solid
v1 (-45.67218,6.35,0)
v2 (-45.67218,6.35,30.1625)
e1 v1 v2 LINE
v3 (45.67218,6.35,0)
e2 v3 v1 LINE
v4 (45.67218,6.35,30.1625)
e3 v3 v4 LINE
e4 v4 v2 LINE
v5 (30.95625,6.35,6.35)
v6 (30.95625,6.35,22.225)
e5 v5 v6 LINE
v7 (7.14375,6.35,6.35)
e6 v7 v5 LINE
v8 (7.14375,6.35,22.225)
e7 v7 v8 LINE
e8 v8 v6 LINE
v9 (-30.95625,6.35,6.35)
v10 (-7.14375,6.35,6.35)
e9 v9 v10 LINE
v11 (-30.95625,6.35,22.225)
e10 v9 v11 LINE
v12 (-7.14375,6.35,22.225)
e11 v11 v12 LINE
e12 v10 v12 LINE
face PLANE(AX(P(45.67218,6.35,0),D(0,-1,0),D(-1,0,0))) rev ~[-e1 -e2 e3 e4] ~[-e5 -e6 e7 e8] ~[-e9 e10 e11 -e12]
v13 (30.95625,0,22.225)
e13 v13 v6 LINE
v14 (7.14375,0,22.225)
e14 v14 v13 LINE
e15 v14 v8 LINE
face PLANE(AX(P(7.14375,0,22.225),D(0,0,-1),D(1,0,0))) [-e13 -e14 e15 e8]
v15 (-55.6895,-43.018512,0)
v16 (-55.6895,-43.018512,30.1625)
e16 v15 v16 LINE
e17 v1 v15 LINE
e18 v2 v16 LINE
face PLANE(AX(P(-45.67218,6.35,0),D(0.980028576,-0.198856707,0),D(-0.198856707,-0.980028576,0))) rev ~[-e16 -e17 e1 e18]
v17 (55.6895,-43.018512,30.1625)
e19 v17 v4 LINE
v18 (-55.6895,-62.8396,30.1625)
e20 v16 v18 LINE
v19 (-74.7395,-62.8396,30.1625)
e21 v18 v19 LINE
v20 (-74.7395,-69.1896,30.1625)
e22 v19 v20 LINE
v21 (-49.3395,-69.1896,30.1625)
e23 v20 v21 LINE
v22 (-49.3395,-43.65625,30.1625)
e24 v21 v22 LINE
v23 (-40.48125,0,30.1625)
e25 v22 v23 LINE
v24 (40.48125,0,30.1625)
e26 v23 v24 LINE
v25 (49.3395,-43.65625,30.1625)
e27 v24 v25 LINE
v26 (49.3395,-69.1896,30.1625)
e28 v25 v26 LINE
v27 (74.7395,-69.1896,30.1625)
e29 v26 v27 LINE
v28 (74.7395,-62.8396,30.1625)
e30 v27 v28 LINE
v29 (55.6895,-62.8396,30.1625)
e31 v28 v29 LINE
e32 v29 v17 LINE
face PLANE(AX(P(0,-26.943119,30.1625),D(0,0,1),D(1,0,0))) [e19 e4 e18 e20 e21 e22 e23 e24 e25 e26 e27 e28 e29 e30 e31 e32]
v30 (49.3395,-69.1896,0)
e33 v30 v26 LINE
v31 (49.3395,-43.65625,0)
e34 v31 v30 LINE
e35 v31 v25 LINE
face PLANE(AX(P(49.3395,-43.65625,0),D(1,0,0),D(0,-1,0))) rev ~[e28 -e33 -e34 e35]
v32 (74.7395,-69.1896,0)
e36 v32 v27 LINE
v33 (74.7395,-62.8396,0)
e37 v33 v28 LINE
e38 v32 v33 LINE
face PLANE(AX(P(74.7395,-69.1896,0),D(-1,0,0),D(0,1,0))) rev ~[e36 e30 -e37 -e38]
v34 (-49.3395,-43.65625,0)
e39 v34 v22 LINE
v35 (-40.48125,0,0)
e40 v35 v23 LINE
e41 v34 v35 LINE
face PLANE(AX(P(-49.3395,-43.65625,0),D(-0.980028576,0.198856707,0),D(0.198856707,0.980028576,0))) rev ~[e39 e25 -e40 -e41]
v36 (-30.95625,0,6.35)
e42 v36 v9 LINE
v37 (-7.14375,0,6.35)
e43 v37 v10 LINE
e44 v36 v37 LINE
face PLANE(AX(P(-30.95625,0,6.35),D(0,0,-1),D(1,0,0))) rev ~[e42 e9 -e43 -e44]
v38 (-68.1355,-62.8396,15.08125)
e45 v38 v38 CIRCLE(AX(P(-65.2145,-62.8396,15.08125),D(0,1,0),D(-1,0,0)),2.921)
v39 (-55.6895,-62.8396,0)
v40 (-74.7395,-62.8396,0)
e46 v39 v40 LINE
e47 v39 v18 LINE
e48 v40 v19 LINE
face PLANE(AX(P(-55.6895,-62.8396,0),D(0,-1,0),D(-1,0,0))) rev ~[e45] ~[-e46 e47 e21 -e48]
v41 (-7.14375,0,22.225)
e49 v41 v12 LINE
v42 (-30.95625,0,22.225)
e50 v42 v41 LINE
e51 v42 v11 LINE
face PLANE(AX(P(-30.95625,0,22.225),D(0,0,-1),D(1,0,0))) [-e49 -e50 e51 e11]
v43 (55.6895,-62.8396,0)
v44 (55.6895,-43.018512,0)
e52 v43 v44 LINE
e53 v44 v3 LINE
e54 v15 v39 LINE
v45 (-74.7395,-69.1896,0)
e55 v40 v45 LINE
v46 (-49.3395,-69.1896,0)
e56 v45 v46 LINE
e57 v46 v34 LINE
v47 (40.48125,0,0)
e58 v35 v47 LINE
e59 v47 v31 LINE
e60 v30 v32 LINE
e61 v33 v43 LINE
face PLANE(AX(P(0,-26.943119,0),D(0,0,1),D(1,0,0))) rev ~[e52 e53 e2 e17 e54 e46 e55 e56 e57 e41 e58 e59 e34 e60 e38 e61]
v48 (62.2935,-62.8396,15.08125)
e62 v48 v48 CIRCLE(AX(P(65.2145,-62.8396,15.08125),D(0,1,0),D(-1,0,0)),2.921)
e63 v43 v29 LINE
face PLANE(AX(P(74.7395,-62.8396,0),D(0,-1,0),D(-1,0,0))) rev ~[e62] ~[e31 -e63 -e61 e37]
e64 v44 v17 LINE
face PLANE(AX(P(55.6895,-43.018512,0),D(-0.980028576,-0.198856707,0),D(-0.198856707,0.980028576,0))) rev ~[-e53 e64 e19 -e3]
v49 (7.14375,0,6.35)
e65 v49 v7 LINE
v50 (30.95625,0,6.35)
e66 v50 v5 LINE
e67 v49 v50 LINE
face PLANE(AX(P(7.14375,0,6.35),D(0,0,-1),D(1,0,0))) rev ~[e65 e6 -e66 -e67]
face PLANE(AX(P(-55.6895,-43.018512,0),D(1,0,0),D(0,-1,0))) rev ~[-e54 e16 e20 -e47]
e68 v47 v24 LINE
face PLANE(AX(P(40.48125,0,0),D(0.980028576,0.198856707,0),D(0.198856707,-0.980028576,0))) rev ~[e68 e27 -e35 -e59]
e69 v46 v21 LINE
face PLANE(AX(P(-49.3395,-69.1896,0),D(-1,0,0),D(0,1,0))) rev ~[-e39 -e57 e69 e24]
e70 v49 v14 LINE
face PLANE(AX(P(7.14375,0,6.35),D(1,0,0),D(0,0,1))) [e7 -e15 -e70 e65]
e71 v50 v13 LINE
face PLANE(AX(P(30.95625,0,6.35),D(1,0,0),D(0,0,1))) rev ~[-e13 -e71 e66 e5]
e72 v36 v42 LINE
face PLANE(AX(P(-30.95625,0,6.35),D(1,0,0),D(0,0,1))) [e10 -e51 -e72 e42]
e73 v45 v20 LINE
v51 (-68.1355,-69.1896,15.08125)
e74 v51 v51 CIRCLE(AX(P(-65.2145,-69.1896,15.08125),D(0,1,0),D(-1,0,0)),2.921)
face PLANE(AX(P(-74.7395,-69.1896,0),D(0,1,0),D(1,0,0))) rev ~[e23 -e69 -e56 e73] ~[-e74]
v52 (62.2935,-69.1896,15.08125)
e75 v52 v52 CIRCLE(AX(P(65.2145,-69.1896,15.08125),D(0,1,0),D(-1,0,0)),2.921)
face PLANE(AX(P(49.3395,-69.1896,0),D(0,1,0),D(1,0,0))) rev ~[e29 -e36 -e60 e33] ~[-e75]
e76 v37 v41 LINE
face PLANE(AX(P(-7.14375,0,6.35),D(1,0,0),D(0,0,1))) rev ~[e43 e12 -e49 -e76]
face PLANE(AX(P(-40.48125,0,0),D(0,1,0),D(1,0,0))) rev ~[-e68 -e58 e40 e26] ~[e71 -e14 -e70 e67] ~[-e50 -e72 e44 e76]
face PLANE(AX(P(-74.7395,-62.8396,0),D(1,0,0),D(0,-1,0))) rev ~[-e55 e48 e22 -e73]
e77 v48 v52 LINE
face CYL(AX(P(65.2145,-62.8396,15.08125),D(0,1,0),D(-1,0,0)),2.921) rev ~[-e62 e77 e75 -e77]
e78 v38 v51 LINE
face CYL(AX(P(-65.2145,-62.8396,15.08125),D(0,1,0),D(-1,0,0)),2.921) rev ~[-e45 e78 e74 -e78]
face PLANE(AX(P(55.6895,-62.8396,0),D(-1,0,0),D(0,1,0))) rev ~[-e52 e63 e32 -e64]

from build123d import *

# Parameters (mm, degrees)
F1_DEPTH = 30.1625
F2_W     = 23.8125
F2_H     = 15.875
F3_DEPTH = 6.35
F4_R     = 2.921
F5_DEPTH = 6.35


# Not quite as in the source:
# - a feature names something its author has since deleted; it is built from what else it names


with BuildPart() as f1:
    # F0 (on Top) → F1 (new body)
    with BuildSketch(Plane.XY):
        Polygon((-40.48125, 0), (0, 0), (40.48125, 0), (49.3395, -43.65625), (49.3395, -69.1896), (55.6895, -69.1896), (74.7395, -69.1896), (74.7395, -62.8396), (55.6895, -62.8396), (55.6895, -43.0185116827), (45.6721801749, 6.35), (0, 6.35), (-45.6721801749, 6.35), (-55.6895, -43.0185116827), (-55.6895, -62.8396), (-74.7395, -62.8396), (-74.7395, -69.1896), (-55.6895, -69.1896), (-49.3395, -69.1896), (-49.3395, -43.65625), align=None)
    extrude(amount=F1_DEPTH)

    # F2 (on face) → F3 (cut, through all)
    with BuildSketch(Plane.XZ):
        with Locations((-19.05, 14.2875)):
            Rectangle(F2_W, F2_H)
        with Locations((19.05, 14.2875)):
            Rectangle(F2_W, F2_H)
    extrude(amount=-F3_DEPTH, mode=Mode.SUBTRACT)

    # F4 (on face) → F5 (cut, through all)
    with BuildSketch(Plane(origin=(0, -62.8396, 0), x_dir=(-1, 0, 0), z_dir=(0, 1, 0))):
        with Locations((65.2145, 15.08125)):
            Circle(F4_R)
        with Locations((-65.2145, 15.08125)):
            Circle(F4_R)
    extrude(amount=-F5_DEPTH, mode=Mode.SUBTRACT)


solid = f1.part
